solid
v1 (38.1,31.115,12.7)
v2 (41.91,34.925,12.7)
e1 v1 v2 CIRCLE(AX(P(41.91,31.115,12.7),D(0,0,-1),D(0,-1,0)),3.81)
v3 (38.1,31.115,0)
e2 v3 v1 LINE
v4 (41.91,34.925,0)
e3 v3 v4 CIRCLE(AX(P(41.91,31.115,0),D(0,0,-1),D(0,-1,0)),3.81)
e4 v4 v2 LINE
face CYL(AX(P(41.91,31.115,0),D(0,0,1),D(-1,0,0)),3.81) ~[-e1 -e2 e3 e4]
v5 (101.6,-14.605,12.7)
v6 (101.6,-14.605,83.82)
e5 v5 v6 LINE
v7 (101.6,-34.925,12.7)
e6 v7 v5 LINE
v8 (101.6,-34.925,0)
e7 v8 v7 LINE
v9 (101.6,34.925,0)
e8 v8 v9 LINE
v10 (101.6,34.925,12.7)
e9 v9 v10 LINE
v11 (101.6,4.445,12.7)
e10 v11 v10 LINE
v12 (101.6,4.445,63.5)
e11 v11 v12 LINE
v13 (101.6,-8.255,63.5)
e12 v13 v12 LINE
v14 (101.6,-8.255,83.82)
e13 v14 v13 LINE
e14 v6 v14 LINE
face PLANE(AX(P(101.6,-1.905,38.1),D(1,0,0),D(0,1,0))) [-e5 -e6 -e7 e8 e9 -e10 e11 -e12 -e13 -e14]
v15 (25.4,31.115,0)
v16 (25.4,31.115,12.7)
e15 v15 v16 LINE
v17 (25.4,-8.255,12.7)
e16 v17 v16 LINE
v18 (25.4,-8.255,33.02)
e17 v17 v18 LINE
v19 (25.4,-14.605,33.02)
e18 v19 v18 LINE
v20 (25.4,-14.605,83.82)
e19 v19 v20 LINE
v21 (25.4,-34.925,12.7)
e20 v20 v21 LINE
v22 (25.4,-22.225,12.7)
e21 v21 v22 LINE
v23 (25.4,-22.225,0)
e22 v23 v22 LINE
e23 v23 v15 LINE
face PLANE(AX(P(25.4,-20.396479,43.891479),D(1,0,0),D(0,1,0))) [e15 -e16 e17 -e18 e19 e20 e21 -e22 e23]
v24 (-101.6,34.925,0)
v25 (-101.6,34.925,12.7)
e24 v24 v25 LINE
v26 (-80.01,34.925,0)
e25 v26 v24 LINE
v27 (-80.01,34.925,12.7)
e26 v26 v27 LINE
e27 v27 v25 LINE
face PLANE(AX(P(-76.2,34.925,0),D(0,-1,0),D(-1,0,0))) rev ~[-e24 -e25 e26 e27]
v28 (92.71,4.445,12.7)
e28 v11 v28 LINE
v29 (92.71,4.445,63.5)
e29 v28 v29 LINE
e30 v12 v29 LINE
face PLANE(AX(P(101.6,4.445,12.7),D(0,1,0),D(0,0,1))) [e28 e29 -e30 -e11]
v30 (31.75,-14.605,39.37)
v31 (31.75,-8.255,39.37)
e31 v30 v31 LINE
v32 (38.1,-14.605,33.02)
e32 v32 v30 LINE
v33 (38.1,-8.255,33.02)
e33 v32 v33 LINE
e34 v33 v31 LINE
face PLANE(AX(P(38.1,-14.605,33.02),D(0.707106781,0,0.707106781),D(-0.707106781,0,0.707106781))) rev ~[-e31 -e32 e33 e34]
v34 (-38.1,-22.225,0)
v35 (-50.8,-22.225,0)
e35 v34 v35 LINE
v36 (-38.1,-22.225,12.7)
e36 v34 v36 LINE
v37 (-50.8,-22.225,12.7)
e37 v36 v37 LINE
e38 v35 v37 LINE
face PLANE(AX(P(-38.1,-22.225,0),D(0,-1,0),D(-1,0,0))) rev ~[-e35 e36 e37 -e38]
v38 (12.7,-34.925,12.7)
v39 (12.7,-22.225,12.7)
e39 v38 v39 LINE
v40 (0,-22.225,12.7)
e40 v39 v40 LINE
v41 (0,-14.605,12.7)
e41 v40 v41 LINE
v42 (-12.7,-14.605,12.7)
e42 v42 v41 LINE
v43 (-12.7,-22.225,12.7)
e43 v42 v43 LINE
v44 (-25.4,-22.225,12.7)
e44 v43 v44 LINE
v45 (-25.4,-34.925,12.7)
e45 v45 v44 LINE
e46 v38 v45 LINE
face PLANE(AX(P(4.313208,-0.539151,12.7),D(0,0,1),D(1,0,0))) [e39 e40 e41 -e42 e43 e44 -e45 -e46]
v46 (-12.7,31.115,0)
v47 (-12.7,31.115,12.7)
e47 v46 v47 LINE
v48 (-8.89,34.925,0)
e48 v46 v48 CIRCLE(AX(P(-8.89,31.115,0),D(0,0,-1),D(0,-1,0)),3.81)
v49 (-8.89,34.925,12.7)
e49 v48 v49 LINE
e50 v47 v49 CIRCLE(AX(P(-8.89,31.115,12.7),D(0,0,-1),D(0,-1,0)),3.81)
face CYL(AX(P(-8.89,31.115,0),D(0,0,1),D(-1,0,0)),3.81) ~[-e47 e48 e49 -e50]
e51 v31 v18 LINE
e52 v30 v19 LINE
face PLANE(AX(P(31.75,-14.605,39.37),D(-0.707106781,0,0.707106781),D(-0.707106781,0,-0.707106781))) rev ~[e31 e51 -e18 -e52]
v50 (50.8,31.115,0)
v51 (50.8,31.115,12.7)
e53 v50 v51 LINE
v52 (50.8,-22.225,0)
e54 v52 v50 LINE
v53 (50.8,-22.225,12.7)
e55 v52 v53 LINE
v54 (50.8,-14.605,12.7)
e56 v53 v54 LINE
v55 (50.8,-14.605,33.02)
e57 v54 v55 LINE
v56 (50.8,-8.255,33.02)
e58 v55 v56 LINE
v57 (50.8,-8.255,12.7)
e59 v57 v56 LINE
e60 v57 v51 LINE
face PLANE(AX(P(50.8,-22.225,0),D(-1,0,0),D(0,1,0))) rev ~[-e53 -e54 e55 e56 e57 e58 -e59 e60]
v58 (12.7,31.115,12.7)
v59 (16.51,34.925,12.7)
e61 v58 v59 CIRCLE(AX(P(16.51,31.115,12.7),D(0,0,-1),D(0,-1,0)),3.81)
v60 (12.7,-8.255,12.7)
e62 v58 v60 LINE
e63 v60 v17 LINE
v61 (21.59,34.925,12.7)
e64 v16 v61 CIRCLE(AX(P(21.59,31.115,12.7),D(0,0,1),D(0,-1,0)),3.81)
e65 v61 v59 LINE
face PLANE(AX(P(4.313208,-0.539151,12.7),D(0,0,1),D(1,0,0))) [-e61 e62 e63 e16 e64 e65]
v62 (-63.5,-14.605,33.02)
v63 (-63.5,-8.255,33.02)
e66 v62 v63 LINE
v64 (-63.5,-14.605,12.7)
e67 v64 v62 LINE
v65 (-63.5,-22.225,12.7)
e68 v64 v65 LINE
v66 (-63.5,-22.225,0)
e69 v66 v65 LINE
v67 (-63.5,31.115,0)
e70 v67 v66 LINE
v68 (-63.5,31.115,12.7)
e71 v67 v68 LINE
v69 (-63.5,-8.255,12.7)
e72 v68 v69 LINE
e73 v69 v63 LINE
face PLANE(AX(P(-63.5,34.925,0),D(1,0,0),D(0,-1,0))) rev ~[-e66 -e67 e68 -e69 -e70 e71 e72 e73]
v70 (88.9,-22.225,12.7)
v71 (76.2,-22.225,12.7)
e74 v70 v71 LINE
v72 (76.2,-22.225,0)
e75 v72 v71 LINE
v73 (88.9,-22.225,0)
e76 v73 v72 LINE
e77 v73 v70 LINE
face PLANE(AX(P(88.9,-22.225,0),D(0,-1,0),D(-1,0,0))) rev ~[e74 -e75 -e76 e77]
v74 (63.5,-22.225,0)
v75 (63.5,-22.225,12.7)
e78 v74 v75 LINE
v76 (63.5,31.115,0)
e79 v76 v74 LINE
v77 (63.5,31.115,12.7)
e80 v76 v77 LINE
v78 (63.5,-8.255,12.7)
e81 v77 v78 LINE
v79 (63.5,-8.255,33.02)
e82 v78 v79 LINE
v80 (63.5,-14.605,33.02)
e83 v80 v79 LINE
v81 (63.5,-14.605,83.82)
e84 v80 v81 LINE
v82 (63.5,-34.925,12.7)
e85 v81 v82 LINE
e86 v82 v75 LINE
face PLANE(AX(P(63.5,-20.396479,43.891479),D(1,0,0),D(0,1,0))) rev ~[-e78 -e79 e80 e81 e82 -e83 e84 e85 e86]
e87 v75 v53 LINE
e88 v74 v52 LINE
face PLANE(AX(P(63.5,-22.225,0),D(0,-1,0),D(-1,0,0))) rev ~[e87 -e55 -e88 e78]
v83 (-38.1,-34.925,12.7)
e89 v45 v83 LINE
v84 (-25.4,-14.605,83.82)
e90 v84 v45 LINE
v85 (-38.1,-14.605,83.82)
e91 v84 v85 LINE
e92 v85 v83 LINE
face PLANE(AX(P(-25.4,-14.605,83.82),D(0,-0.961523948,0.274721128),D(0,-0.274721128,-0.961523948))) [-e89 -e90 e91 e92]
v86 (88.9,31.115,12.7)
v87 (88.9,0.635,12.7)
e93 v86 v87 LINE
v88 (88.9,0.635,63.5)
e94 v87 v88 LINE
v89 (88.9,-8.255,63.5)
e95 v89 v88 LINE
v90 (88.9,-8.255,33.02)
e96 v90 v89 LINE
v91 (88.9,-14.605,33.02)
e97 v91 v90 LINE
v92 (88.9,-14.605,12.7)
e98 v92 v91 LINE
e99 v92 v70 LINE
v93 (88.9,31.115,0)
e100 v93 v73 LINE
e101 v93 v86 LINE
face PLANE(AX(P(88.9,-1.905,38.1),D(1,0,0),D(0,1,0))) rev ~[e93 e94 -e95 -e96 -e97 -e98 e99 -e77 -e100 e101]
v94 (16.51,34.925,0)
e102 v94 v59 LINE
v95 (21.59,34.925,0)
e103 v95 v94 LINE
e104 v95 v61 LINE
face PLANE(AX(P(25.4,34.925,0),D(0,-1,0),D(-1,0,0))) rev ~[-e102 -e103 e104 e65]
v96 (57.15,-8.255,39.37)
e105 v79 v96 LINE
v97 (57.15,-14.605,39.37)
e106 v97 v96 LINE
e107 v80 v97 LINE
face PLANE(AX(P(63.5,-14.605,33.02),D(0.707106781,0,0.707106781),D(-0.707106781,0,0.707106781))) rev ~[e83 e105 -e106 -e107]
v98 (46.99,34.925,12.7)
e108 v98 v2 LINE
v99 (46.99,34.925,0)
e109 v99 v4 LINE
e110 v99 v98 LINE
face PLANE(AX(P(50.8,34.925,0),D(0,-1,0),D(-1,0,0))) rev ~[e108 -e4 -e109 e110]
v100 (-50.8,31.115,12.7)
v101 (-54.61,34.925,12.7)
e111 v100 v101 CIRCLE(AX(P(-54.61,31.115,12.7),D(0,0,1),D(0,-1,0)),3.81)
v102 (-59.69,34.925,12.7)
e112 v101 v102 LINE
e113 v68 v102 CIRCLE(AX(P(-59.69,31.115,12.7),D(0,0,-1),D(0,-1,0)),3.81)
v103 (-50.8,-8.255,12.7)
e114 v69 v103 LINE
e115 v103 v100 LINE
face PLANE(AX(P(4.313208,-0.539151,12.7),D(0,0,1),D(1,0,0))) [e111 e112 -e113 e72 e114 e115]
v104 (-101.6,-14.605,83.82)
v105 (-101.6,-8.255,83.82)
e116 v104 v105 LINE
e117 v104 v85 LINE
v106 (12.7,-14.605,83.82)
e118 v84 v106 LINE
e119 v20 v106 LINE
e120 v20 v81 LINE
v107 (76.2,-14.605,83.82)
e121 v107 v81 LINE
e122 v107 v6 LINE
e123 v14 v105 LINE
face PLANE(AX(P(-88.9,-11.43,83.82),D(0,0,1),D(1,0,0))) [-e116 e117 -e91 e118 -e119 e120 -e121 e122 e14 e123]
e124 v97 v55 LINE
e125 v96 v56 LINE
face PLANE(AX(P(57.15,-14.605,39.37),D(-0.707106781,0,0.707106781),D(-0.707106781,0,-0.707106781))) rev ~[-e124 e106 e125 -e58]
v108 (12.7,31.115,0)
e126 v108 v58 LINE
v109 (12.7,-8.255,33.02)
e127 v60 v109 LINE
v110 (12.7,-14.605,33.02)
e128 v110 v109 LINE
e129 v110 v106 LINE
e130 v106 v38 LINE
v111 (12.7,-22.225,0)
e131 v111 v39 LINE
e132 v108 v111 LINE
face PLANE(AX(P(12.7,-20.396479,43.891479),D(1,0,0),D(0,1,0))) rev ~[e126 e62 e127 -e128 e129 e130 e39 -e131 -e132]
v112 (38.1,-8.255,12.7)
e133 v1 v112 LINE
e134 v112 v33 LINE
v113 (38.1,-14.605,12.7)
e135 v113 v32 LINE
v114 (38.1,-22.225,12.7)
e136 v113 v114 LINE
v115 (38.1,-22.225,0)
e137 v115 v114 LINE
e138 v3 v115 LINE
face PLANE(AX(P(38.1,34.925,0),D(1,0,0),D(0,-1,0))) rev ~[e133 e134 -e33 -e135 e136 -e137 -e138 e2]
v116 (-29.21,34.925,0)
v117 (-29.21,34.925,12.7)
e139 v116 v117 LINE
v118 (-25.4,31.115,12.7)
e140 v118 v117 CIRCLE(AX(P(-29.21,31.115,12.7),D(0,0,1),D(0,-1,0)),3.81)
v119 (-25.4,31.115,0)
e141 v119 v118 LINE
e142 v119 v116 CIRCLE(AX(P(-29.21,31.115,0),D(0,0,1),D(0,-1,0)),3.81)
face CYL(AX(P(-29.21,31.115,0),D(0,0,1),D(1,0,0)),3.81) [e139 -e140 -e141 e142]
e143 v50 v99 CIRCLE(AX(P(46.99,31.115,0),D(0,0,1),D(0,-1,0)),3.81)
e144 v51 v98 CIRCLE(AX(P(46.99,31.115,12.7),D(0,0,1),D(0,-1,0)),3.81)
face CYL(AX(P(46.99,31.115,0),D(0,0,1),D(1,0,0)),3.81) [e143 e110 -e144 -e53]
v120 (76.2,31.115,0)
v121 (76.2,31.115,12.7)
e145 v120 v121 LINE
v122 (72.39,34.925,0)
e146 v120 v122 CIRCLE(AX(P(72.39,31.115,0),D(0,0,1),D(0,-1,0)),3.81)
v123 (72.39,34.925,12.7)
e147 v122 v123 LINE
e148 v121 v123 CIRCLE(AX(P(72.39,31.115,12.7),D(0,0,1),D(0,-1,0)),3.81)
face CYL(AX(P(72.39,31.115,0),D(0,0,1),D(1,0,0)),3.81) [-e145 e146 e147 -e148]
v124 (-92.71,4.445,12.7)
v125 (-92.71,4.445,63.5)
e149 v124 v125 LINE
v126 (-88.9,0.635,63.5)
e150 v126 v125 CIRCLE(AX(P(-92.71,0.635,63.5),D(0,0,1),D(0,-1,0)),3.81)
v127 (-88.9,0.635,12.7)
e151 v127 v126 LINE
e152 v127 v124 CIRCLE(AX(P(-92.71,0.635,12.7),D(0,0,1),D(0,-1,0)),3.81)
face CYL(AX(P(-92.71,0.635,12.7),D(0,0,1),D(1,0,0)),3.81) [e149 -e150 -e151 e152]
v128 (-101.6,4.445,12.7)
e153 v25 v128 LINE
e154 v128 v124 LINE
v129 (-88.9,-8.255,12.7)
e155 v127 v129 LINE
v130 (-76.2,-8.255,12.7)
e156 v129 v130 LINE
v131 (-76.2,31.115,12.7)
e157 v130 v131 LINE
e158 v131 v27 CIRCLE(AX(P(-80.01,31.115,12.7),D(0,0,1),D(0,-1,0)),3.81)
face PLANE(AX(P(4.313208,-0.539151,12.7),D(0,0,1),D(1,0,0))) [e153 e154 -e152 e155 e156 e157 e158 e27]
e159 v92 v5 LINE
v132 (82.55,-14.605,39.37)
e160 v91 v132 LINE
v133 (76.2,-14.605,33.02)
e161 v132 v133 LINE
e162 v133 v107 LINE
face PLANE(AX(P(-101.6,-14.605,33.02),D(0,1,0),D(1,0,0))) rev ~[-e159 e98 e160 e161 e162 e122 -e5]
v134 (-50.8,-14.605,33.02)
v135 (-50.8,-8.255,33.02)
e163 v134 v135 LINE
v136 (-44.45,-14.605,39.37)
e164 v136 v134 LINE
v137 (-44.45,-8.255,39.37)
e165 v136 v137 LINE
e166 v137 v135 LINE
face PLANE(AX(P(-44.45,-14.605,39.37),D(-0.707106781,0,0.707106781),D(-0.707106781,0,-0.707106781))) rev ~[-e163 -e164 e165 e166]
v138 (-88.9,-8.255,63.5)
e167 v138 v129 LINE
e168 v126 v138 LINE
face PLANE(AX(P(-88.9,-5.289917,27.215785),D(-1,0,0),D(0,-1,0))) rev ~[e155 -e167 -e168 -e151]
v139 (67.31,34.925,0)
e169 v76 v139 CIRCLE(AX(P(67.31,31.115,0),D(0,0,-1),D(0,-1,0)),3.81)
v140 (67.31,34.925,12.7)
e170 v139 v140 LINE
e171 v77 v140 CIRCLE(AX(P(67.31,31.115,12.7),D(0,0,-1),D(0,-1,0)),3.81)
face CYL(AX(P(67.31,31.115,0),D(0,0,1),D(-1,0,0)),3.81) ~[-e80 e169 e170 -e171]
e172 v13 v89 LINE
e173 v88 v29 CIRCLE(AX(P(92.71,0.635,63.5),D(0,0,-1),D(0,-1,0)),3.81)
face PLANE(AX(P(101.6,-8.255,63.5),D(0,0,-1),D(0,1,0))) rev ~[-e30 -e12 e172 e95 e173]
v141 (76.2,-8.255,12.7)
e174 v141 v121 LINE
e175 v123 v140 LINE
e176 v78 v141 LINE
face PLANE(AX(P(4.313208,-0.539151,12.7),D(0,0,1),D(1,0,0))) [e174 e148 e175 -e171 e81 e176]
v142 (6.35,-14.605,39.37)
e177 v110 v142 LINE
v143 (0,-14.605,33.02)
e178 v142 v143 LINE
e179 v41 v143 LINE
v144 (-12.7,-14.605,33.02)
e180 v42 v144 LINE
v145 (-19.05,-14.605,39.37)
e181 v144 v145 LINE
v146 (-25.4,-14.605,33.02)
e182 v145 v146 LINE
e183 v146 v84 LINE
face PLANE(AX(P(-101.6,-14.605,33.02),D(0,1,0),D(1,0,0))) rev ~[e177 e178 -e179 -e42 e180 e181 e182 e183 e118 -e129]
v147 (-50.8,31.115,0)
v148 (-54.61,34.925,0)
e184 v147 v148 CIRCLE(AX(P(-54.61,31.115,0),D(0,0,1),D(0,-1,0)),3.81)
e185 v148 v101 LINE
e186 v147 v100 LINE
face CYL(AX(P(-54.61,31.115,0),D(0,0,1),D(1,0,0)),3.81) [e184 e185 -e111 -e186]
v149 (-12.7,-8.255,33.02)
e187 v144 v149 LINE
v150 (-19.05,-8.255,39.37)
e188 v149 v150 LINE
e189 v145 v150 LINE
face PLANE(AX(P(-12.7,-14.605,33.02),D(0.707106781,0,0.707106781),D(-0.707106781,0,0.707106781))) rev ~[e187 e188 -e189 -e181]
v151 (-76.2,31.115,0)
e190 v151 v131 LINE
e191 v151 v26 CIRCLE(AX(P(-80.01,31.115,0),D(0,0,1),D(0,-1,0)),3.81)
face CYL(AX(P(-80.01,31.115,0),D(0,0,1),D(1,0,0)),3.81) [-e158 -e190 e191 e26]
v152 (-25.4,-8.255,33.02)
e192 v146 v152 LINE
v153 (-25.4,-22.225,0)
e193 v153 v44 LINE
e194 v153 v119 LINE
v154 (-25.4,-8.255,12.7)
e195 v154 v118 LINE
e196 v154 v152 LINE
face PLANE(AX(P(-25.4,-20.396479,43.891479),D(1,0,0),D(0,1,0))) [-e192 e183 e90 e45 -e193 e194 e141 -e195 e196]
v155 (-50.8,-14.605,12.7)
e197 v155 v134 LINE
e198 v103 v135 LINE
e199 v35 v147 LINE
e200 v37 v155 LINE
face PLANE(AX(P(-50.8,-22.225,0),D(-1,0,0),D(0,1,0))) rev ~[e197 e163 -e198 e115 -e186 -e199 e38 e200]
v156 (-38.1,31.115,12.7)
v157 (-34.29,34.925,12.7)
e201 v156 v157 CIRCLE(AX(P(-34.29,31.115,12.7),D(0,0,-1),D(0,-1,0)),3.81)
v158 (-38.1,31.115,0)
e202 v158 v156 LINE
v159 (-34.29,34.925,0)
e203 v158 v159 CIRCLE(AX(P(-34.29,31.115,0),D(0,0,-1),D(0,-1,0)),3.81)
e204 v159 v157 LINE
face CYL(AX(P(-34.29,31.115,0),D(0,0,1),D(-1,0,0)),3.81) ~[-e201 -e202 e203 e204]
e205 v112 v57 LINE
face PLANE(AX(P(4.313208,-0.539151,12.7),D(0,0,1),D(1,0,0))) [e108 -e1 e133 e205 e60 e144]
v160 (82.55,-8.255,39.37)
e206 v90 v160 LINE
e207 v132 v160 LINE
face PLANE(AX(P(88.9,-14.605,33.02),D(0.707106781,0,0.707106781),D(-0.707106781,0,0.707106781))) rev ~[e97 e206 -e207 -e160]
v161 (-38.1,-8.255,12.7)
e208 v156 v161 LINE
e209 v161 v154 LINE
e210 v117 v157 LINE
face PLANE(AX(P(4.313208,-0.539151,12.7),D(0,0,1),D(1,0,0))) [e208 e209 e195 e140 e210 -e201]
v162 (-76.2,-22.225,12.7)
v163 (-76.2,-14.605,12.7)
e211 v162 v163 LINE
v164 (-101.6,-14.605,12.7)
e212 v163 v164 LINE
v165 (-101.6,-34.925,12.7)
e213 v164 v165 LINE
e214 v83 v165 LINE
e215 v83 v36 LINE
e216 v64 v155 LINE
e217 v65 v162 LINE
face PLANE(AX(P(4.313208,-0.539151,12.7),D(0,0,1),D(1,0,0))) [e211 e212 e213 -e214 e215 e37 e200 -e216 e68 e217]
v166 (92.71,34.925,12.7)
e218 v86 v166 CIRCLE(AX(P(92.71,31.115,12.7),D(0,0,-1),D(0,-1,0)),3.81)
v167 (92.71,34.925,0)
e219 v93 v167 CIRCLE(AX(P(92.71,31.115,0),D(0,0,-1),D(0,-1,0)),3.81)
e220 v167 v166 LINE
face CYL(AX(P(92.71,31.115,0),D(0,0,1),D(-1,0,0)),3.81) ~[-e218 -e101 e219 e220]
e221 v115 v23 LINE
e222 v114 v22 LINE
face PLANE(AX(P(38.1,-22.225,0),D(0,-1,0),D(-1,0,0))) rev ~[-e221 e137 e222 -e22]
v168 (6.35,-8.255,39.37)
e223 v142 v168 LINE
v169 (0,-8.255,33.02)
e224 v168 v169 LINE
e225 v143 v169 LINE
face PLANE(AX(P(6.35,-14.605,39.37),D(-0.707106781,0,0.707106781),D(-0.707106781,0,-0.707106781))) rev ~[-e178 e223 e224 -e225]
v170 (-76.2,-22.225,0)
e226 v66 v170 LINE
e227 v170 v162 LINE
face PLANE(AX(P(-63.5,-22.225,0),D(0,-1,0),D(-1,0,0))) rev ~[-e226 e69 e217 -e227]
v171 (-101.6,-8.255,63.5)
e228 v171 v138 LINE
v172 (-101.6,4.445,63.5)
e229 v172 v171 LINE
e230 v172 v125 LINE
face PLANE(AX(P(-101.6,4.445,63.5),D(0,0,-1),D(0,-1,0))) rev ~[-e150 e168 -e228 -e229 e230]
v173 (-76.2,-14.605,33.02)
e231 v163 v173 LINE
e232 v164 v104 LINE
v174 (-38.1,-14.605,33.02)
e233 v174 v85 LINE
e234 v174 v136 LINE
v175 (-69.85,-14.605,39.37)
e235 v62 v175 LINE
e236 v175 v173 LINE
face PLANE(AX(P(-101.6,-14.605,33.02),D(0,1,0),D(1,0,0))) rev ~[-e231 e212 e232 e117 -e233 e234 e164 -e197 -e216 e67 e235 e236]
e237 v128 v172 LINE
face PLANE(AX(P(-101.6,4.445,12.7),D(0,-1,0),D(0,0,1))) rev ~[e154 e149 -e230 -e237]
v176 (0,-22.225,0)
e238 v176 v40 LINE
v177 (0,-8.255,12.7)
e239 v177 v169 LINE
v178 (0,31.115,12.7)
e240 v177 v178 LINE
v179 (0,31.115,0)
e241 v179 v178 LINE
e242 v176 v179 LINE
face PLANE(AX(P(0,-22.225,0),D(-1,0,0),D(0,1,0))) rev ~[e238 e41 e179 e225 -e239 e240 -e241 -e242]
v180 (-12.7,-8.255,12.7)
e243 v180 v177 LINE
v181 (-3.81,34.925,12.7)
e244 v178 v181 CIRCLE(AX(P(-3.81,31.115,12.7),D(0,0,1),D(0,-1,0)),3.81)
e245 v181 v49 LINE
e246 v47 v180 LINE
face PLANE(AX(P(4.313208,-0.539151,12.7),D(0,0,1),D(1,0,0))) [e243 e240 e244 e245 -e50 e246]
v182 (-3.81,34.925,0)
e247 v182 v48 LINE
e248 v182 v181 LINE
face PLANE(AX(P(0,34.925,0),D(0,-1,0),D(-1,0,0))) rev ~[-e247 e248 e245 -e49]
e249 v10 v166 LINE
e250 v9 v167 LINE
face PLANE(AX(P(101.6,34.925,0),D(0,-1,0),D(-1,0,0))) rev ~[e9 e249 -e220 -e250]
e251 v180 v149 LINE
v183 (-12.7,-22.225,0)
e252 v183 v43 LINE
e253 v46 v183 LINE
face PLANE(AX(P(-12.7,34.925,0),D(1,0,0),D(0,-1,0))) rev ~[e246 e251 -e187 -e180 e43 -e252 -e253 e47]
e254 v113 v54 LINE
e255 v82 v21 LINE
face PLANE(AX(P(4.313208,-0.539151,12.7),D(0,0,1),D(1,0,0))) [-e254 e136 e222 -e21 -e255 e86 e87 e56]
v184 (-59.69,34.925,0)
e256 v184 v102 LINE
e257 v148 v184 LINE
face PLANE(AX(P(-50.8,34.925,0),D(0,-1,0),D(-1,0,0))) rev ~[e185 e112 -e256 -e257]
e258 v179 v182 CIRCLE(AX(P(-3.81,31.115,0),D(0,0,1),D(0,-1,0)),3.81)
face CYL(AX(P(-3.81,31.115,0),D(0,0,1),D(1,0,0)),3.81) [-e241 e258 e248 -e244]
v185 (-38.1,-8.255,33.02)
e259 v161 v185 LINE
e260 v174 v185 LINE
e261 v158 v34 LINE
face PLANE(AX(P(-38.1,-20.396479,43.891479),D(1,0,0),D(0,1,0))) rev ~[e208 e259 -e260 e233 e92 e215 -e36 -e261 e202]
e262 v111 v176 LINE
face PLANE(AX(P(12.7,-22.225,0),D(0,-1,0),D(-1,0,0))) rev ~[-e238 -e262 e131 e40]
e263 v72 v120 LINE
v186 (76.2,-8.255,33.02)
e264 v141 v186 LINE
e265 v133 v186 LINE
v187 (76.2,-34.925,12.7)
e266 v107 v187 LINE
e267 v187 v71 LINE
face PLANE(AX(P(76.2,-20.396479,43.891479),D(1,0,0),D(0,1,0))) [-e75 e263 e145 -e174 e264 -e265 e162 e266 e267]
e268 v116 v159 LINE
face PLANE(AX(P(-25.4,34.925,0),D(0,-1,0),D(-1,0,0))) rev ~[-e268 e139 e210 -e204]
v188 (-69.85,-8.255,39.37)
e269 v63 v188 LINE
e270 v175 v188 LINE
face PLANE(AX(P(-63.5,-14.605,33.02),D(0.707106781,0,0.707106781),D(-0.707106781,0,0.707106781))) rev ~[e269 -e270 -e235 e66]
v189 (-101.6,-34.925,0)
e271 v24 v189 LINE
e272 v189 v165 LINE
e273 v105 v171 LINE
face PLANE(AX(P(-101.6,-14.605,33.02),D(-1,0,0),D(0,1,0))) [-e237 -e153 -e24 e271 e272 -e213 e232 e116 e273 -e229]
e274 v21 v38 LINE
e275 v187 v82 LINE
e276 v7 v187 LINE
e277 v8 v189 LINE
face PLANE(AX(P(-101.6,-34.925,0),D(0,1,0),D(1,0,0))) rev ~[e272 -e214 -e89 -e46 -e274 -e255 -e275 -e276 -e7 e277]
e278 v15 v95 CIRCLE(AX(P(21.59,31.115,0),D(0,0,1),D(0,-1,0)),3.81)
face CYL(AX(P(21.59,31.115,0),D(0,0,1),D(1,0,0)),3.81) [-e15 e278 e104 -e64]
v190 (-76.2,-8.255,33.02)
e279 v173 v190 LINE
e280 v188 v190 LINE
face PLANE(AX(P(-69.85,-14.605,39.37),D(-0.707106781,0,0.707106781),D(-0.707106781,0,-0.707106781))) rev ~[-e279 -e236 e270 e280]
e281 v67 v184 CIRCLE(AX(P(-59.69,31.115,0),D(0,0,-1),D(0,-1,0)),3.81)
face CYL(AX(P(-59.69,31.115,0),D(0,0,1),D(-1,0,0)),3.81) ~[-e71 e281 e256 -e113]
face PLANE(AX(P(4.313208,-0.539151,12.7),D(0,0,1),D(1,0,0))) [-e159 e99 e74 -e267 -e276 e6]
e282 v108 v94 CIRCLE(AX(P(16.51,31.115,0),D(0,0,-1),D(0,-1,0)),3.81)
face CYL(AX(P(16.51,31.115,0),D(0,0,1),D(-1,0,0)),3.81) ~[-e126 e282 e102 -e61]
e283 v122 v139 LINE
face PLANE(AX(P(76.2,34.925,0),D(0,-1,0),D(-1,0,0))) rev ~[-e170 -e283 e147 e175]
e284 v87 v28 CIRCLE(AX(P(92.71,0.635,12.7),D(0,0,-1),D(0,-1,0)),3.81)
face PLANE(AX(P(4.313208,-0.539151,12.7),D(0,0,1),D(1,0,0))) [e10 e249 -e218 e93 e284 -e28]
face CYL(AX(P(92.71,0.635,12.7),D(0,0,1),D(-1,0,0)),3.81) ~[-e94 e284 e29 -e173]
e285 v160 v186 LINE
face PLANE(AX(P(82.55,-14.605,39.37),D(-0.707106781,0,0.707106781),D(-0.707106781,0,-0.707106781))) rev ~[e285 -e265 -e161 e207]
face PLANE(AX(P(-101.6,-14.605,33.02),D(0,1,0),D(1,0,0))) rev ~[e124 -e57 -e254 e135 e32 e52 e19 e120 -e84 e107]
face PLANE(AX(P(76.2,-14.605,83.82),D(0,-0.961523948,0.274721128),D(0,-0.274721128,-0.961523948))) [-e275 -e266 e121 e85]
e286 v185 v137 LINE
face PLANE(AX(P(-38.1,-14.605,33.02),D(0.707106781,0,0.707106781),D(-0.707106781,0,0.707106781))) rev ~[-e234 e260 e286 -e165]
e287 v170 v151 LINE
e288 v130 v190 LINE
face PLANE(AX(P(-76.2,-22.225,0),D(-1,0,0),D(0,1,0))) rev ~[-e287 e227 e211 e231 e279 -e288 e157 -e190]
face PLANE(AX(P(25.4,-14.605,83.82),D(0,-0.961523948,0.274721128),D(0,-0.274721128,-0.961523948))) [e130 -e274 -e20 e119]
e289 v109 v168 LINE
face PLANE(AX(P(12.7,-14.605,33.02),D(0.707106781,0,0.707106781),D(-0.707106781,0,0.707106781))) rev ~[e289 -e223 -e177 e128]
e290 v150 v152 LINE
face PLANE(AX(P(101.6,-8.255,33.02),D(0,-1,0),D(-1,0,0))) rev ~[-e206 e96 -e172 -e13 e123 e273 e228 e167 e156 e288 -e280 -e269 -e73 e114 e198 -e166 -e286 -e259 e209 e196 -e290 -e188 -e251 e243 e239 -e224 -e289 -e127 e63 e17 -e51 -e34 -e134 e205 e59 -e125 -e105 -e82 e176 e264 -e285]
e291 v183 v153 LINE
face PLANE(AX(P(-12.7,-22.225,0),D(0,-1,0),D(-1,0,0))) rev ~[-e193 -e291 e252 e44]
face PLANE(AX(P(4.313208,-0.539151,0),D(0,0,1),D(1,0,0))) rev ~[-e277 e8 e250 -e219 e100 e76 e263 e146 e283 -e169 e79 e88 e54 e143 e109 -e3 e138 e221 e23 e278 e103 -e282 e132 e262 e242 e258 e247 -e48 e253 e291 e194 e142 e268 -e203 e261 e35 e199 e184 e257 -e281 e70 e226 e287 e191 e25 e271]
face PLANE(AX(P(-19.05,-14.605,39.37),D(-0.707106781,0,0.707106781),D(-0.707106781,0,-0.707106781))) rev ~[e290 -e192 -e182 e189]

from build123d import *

# Parameters (mm, degrees)
F0_W      = 12.7
F0_H      = 57.15
F1_DEPTH  = 12.7
F2_W      = 25.4
F2_H      = 6.35
F2_W_2    = 12.7
F3_DEPTH  = 20.32
F4_W      = 25.4
F4_H      = 6.35
F4_W_2    = 12.7
F5_DEPTH  = 50.8
F6_W      = 12.7
F6_H      = 50.8
F7_DEPTH  = 12.7
F9_DEPTH  = 12.7
F11_DEPTH = 12.7
F13_DEPTH = 12.7
F14_W     = 12.7
F14_H     = 50.8
F15_DEPTH = 12.7
F16_R     = 3.81
F18_DEPTH = 6.35
F19_R     = 3.81


# Not quite as in the source:
# - a feature names something its author has since deleted; it is built from what else it names


with BuildPart() as f1:
    # F0 (on Top) → F1 (new body)
    with BuildSketch(Plane.XY):
        Polygon((101.6, -34.925), (101.6, 34.925), (88.9, 34.925), (88.9, -22.225), (76.2, -22.225), (76.2, 34.925), (63.5, 34.925), (63.5, -22.225), (50.8, -22.225), (50.8, 34.925), (38.1, 34.925), (38.1, -22.225), (25.4, -22.225), (25.4, 34.925), (12.7, 34.925), (12.7, -22.225), (0, -22.225), (0, 34.925), (-12.7, 34.925), (-12.7, -22.225), (-25.4, -22.225), (-25.4, 34.925), (-38.1, 34.925), (-38.1, -22.225), (-50.8, -22.225), (-50.8, 34.925), (-63.5, 34.925), (-63.5, -22.225), (-76.2, -22.225), (-76.2, 34.925), (-88.9, 34.925), (-88.9, -22.225), (-101.6, -22.225), (-101.6, -34.925), align=None)
        with Locations((-95.25, 6.35)):
            Rectangle(F0_W, F0_H)
    extrude(amount=F1_DEPTH)

    # F2 (on face) → F3 (join)
    with BuildSketch(Plane.XY.offset(12.7)):
        with Locations((-88.9, -11.43)):
            Rectangle(F2_W, F2_H)
        with Locations((-31.75, -11.43)):
            Rectangle(F2_W_2, F2_H)
        with Locations((-6.35, -11.43)):
            Rectangle(F2_W_2, F2_H)
        with Locations((19.05, -11.43)):
            Rectangle(F2_W_2, F2_H)
        with Locations((44.45, -11.43)):
            Rectangle(F2_W_2, F2_H)
        with Locations((69.85, -11.43)):
            Rectangle(F2_W_2, F2_H)
        with Locations((95.25, -11.43)):
            Rectangle(F2_W_2, F2_H)
        with Locations((-57.15, -11.43)):
            Rectangle(F2_W_2, F2_H)
    extrude(amount=F3_DEPTH)

    # F4 (on face) → F5 (join)
    with BuildSketch(Plane.XY.offset(33.02)):
        with Locations((-88.9, -11.43)):
            Rectangle(F4_W, F4_H)
        with Locations((-69.85, -11.43)):
            Rectangle(F4_W_2, F4_H)
        with Locations((-57.15, -11.43)):
            Rectangle(F4_W_2, F4_H)
        with Locations((-44.45, -11.43)):
            Rectangle(F4_W_2, F4_H)
        with Locations((-31.75, -11.43)):
            Rectangle(F4_W_2, F4_H)
        with Locations((-19.05, -11.43)):
            Rectangle(F4_W_2, F4_H)
        with Locations((-6.35, -11.43)):
            Rectangle(F4_W_2, F4_H)
        with Locations((6.35, -11.43)):
            Rectangle(F4_W_2, F4_H)
        with Locations((19.05, -11.43)):
            Rectangle(F4_W_2, F4_H)
        with Locations((31.75, -11.43)):
            Rectangle(F4_W_2, F4_H)
        with Locations((44.45, -11.43)):
            Rectangle(F4_W_2, F4_H)
        with Locations((57.15, -11.43)):
            Rectangle(F4_W_2, F4_H)
        with Locations((69.85, -11.43)):
            Rectangle(F4_W_2, F4_H)
        with Locations((82.55, -11.43)):
            Rectangle(F4_W_2, F4_H)
        with Locations((95.25, -11.43)):
            Rectangle(F4_W_2, F4_H)
    extrude(amount=F5_DEPTH)

    # F6 (on face) → F7 (join)
    with BuildSketch(Plane(origin=(-101.6, 0, 0), x_dir=(0, -1, 0), z_dir=(-1, 0, 0))):
        Polygon((8.255, 63.5), (8.255, 12.7), (-4.445, 12.7), (-34.925, 12.7), (-34.925, 0), (34.925, 0), (34.925, 12.7), (14.605, 12.7), (14.605, 83.82), (8.255, 83.82), align=None)
        with Locations((1.905, 38.1)):
            Rectangle(F6_W, F6_H)
    extrude(amount=-F7_DEPTH)

    # F8 (on face) → F9 (join, through all)
    with BuildSketch(Plane.YZ.offset(-25.4)):
        Polygon((-14.605, 33.02), (-14.605, 83.82), (-34.925, 12.7), (-22.225, 12.7), (-14.605, 12.7), align=None)
    extrude(amount=-F9_DEPTH)

    # F10 (on face) → F11 (join, through all)
    with BuildSketch(Plane.YZ.offset(25.4)):
        Polygon((-14.605, 33.02), (-14.605, 83.82), (-34.925, 12.7), (-22.225, 12.7), (-14.605, 12.7), align=None)
    extrude(amount=-F11_DEPTH)

    # F12 (on face) → F13 (join, through all)
    with BuildSketch(Plane.YZ.offset(76.2)):
        Polygon((-14.605, 33.02), (-14.605, 83.82), (-34.925, 12.7), (-22.225, 12.7), (-14.605, 12.7), align=None)
    extrude(amount=-F13_DEPTH)

    # F14 (on face) → F15 (join, through all)
    with BuildSketch(Plane.YZ.offset(101.6)):
        with Locations((-1.905, 38.1)):
            Rectangle(F14_W, F14_H)
    extrude(amount=-F15_DEPTH)

    # F16
    f16_edges = [f1.edges().sort_by_distance(p)[0] for p in [
        (88.9, 34.925, 6.35),
        (63.5, 34.925, 6.35),
        (38.1, 34.925, 6.35),
        (12.7, 34.925, 6.35),
        (-12.7, 34.925, 6.35),
        (-38.1, 34.925, 6.35),
        (76.2, 34.925, 6.35),
        (50.8, 34.925, 6.35),
        (25.4, 34.925, 6.35),
        (0, 34.925, 6.35),
        (-25.4, 34.925, 6.35),
        (-50.8, 34.925, 6.35),
        (-76.2, 34.925, 6.35),
        (-63.5, 34.925, 6.35),
    ]]
    fillet(f16_edges, radius=F16_R)

    # F17 (on face) → F18 (cut, through all)
    with BuildSketch(Plane.XZ.offset(14.605)):
        Polygon((-44.45, 39.37), (-50.8, 33.02), (-38.1, 33.02), align=None)
        Polygon((-25.4, 33.02), (-12.7, 33.02), (-19.05, 39.37), align=None)
        Polygon((6.35, 39.37), (0, 33.02), (12.7, 33.02), align=None)
        Polygon((31.75, 39.37), (25.4, 33.02), (38.1, 33.02), align=None)
        Polygon((57.15, 39.37), (50.8, 33.02), (63.5, 33.02), align=None)
        Polygon((76.2, 33.02), (88.9, 33.02), (82.55, 39.37), align=None)
        Polygon((-76.2, 33.02), (-63.5, 33.02), (-69.85, 39.37), align=None)
    extrude(amount=-F18_DEPTH, mode=Mode.SUBTRACT)

    # F19
    f19_edges = [f1.edges().sort_by_distance(p)[0] for p in [
        (-88.9, 4.445, 38.1),
        (88.9, 4.445, 38.1),
    ]]
    fillet(f19_edges, radius=F19_R)


solid = f1.part
